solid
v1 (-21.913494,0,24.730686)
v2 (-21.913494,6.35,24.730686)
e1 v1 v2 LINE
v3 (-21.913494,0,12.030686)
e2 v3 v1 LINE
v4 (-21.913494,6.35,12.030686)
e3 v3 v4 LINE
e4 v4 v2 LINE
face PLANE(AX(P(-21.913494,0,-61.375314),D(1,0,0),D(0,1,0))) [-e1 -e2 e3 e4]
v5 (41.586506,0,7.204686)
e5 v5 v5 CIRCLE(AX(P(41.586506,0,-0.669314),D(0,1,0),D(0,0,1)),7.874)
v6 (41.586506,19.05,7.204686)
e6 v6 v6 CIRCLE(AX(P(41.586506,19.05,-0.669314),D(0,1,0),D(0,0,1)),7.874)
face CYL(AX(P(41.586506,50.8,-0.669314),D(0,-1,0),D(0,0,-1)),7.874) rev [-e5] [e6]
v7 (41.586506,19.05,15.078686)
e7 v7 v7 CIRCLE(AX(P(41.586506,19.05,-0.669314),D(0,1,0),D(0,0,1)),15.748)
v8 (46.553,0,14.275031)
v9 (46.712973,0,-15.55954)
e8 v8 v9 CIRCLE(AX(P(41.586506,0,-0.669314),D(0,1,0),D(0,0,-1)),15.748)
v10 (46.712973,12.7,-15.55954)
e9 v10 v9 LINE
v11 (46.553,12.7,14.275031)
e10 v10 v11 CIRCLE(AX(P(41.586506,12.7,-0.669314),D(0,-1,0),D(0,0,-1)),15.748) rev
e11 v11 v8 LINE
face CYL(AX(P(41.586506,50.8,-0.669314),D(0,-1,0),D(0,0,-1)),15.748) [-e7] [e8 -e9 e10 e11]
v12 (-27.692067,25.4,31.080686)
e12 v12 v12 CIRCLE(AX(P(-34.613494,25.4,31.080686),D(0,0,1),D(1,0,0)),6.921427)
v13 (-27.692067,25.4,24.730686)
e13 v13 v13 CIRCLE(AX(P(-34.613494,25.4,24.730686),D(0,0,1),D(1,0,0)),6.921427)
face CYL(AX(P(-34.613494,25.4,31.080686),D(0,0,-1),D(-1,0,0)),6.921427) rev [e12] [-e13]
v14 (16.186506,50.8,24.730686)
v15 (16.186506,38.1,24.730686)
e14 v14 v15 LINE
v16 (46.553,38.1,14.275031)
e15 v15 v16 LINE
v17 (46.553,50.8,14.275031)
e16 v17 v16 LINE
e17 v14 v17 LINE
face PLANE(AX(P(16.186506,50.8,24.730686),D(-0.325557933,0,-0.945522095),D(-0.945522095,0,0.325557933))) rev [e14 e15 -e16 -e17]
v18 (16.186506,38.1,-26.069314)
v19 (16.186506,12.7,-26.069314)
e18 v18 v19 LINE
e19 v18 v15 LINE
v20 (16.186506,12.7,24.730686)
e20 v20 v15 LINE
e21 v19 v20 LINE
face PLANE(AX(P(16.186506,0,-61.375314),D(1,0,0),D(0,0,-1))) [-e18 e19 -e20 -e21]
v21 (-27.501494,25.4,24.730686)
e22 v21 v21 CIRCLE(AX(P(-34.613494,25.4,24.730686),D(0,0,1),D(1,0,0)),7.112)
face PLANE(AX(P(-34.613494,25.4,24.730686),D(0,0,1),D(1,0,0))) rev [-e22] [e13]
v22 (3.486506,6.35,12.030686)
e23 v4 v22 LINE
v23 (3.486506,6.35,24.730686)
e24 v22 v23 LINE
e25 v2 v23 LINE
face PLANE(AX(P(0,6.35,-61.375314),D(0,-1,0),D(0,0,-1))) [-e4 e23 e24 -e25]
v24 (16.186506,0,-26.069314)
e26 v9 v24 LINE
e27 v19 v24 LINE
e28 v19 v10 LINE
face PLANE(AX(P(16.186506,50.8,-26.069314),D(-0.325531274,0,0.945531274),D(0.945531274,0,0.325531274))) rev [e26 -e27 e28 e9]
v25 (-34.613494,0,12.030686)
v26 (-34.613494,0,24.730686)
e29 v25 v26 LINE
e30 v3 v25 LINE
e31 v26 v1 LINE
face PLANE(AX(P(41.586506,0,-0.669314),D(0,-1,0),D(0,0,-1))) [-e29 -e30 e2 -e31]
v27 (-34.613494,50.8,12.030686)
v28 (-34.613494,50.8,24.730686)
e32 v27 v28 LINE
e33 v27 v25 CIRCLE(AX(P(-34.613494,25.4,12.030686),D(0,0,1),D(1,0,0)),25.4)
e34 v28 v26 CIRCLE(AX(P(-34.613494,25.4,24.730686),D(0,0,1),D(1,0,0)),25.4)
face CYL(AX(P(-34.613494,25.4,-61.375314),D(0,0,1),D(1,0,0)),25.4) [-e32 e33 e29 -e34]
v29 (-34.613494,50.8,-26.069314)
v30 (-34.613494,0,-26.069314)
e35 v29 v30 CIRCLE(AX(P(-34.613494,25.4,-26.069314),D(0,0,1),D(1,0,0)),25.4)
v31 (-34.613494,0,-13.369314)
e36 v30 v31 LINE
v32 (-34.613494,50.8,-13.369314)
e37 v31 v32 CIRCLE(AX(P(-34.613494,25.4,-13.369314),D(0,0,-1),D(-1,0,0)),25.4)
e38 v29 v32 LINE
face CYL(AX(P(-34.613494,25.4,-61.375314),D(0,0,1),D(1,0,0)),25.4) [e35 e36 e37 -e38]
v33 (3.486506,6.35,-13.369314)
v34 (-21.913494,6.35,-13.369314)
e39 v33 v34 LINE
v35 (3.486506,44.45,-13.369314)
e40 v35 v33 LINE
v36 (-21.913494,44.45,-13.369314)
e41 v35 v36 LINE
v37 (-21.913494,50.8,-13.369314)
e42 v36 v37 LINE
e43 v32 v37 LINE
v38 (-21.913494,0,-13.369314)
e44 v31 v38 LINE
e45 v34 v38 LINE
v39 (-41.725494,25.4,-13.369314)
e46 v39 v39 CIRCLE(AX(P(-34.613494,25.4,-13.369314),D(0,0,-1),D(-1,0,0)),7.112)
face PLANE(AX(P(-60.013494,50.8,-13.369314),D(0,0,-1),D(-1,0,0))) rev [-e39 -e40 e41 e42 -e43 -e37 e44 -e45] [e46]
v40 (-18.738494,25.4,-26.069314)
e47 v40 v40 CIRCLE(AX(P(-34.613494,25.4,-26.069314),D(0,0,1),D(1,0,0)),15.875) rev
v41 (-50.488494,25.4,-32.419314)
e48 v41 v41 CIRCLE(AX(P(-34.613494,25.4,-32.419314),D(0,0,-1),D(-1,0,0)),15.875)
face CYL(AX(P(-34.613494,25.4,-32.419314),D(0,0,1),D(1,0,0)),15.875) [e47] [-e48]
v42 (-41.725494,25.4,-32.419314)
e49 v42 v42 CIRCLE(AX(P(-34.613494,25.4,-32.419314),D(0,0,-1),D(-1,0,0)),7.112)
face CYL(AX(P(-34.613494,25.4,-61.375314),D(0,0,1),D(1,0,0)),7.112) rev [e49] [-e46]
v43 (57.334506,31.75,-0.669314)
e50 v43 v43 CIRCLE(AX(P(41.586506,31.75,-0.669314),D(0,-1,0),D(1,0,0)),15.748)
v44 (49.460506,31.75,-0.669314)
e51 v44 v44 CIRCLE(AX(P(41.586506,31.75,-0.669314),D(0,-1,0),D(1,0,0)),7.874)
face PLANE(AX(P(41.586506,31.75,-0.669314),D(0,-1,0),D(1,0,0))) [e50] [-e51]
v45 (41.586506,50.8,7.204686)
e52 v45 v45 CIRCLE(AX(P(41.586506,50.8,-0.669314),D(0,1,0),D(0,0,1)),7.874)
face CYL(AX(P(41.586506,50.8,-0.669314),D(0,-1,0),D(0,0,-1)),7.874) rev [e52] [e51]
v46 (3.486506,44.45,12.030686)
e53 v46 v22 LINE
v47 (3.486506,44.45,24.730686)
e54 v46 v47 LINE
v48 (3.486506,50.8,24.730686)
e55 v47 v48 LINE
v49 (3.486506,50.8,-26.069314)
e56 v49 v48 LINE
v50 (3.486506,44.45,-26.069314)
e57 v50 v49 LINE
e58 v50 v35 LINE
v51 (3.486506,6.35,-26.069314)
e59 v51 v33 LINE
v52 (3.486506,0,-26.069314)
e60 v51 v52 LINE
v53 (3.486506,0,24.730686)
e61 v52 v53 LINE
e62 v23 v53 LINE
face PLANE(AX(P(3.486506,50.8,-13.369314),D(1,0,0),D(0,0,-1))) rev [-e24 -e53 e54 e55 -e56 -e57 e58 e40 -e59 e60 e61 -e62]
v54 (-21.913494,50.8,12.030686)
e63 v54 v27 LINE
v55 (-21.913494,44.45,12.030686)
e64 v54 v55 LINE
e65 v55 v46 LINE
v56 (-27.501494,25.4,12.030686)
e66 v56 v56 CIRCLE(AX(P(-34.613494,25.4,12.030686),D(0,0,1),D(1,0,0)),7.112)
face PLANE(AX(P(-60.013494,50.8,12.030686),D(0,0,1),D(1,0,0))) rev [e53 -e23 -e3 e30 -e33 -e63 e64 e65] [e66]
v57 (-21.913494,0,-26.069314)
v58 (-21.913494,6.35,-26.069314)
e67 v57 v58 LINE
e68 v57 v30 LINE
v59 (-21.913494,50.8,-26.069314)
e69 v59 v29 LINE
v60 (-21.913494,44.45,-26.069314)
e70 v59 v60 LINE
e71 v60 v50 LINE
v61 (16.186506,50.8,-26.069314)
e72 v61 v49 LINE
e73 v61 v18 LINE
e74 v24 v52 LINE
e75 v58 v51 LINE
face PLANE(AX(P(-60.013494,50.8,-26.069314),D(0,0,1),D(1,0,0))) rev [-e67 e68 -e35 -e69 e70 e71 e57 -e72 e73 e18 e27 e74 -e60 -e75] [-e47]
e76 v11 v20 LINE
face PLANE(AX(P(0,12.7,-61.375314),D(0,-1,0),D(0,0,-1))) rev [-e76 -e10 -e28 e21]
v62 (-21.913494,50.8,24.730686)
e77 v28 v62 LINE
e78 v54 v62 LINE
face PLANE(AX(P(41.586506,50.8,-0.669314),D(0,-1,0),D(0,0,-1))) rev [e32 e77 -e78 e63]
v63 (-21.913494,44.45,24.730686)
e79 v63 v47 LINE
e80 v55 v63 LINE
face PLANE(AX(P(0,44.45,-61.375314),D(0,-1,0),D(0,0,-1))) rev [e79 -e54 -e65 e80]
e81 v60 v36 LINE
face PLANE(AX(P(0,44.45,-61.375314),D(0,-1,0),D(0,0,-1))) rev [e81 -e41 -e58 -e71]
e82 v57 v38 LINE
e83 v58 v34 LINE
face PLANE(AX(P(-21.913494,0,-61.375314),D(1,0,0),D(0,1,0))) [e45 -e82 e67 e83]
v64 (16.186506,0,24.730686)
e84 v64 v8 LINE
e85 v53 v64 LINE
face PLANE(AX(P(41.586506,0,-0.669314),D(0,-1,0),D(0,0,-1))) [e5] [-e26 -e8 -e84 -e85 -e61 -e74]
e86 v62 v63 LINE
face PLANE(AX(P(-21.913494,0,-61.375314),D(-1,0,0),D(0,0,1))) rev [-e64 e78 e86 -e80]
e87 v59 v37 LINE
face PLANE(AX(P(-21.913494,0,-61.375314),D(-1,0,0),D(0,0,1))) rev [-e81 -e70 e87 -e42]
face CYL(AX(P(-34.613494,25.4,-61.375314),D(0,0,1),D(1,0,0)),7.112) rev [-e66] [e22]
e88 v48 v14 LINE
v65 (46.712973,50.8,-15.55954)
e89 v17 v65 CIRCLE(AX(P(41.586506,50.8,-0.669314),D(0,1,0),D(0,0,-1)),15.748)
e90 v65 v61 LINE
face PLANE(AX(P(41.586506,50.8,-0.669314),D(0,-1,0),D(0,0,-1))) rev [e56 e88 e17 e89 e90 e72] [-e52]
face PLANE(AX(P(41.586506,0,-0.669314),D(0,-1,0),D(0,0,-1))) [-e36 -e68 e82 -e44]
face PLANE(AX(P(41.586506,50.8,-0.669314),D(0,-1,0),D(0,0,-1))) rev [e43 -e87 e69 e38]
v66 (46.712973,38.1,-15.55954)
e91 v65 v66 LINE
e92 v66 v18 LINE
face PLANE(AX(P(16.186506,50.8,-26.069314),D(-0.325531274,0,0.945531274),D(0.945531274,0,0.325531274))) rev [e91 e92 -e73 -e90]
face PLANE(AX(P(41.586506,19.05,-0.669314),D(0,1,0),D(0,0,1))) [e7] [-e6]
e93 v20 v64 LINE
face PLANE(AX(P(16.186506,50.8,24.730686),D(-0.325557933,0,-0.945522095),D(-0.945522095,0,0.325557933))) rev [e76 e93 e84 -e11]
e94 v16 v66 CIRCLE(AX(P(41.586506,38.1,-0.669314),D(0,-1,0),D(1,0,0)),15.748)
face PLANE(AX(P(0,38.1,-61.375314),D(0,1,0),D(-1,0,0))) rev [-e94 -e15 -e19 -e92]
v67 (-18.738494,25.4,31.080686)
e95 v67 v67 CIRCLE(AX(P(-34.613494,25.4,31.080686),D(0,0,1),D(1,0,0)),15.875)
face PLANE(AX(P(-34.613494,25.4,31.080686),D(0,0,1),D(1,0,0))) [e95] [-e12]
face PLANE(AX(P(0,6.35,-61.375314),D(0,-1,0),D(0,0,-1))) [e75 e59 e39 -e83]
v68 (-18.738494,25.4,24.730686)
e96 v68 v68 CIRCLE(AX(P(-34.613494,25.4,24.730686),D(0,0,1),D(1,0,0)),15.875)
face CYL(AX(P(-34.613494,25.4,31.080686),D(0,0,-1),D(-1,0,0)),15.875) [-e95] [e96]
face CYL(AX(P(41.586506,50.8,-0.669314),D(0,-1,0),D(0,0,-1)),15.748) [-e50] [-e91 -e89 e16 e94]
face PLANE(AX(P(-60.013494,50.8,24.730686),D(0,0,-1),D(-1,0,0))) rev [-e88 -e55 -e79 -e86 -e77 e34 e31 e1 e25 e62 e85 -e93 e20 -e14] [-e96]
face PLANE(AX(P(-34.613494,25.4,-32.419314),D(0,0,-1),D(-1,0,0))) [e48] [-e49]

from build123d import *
from build123d.topology import SkipClean

# Parameters (mm, degrees)
SKETCH1_R           = 7.874
BOSS_EXTRUDE1_DEPTH = 50.8
SKETCH2_W           = 25.4
SKETCH2_H           = 6.35
SKETCH2_W_2         = 49.568192559
SKETCH2_H_2         = 25.4
SKETCH2_R           = 7.112
CUT_EXTRUDE1_DEPTH  = 86.106
SKETCH3_R           = 15.875
SKETCH3_R_2         = 6.921426928
BOSS_EXTRUDE2_DEPTH = 6.35
SKETCH4_R           = 15.875
SKETCH4_R_2         = 7.112
BOSS_EXTRUDE3_DEPTH = 6.35
SKETCH5_R           = 15.748
SKETCH5_R_2         = 7.874
BOSS_EXTRUDE4_DEPTH = 6.35
BOSS_EXTRUDE5_START = 6.35
SKETCH6_R           = 15.748
SKETCH6_R_2         = 7.874
BOSS_EXTRUDE5_DEPTH = 6.35


with BuildPart() as part:
    # Sketch1 → Boss-Extrude1 (new body)
    with BuildSketch(Plane(origin=(0, 0, 0), x_dir=(1, 0, 0), z_dir=(0, 1, 0))):
        with BuildLine():
            Line((-60.013493944, 26.069313577), (16.186506056, 26.069313577))
            Line((16.186506056, 26.069313577), (46.712972556, 15.559540077))
            ThreePointArc((46.712972556, 15.559540077), (57.334279676, 0.584874102), (46.55299975, -14.27503132))
            Line((46.55299975, -14.27503132), (16.186506056, -24.730686423))
            Line((16.186506056, -24.730686423), (-60.013493944, -24.730686423))
            Line((-60.013493944, -24.730686423), (-60.013493944, -12.030686423))
            Line((-60.013493944, -12.030686423), (3.486506056, -12.030686423))
            Line((3.486506056, -12.030686423), (3.486506056, 13.369313577))
            Line((3.486506056, 13.369313577), (-60.013493944, 13.369313577))
            Line((-60.013493944, 13.369313577), (-60.013493944, 26.069313577))
        make_face()
        with Locations((41.586506056, 0.669313577)):
            Circle(SKETCH1_R, mode=Mode.SUBTRACT)
    extrude(amount=BOSS_EXTRUDE1_DEPTH)

    # Sketch2 → Cut-Extrude1 (cut)
    with BuildSketch(Plane.XY.offset(24.730686423)):
        with BuildLine():
            ThreePointArc((-60.013493944, 25.4), (-52.574006186, 43.360512242), (-34.613493944, 50.8))
            Line((-34.613493944, 50.8), (-60.013493944, 50.8))
            Line((-60.013493944, 50.8), (-60.013493944, 25.4))
        make_face()
        with BuildLine():
            ThreePointArc((-34.613493944, 0), (-52.574006186, 7.439487758), (-60.013493944, 25.4))
            Line((-60.013493944, 25.4), (-60.013493944, 0))
            Line((-60.013493944, 0), (-34.613493944, 0))
        make_face()
        with Locations((-9.213493944, 47.625)):
            Rectangle(SKETCH2_W, SKETCH2_H)
        with Locations((-9.213493944, 3.175)):
            Rectangle(SKETCH2_W, SKETCH2_H)
        with Locations((40.970602336, 25.4)):
            Rectangle(SKETCH2_W_2, SKETCH2_H_2)
        with Locations((-34.613493944, 25.4)):
            Circle(SKETCH2_R)
    extrude(amount=-CUT_EXTRUDE1_DEPTH, mode=Mode.SUBTRACT)

    # Sketch3 → Boss-Extrude2 (add)
    with BuildSketch(Plane.XY.offset(24.730686423)):
        with Locations((-34.613493944, 25.4)):
            Circle(SKETCH3_R)
        with Locations((-34.613493944, 25.4)):
            Circle(SKETCH3_R_2, mode=Mode.SUBTRACT)
    extrude(amount=BOSS_EXTRUDE2_DEPTH)

    # Sketch4 → Boss-Extrude3 (add)
    with SkipClean():  # the faces are left unmerged after this step: merging them gives an invalid solid
        with BuildSketch(Plane(origin=(0, 0, -26.069313577), x_dir=(-1, 0, 0), z_dir=(0, 0, -1))):
            with Locations((34.613493944, 25.4)):
                Circle(SKETCH4_R)
            with Locations((34.613493944, 25.4)):
                Circle(SKETCH4_R_2, mode=Mode.SUBTRACT)
        extrude(amount=BOSS_EXTRUDE3_DEPTH)

    # Sketch5 → Boss-Extrude4 (add)
    with SkipClean():  # the faces are left unmerged after this step: merging them gives an invalid solid
        with BuildSketch(Plane(origin=(0, 12.7, 0), x_dir=(1, 0, 0), z_dir=(0, 1, 0))):
            with Locations((41.586506056, 0.669313577)):
                Circle(SKETCH5_R)
            with Locations((41.586506056, 0.669313577)):
                Circle(SKETCH5_R_2, mode=Mode.SUBTRACT)
        extrude(amount=BOSS_EXTRUDE4_DEPTH)
    add(part.part.scale(1), mode=Mode.REPLACE)  # the faces are merged on a copy

    # Sketch6 → Boss-Extrude5 (add)
    with BuildSketch(Plane.XZ.offset(-38.1).offset(BOSS_EXTRUDE5_START)):
        with Locations((41.586506056, -0.669313577)):
            Circle(SKETCH6_R)
        with Locations((41.586506056, -0.669313577)):
            Circle(SKETCH6_R_2, mode=Mode.SUBTRACT)
    extrude(amount=-BOSS_EXTRUDE5_DEPTH)


solid = part.part
